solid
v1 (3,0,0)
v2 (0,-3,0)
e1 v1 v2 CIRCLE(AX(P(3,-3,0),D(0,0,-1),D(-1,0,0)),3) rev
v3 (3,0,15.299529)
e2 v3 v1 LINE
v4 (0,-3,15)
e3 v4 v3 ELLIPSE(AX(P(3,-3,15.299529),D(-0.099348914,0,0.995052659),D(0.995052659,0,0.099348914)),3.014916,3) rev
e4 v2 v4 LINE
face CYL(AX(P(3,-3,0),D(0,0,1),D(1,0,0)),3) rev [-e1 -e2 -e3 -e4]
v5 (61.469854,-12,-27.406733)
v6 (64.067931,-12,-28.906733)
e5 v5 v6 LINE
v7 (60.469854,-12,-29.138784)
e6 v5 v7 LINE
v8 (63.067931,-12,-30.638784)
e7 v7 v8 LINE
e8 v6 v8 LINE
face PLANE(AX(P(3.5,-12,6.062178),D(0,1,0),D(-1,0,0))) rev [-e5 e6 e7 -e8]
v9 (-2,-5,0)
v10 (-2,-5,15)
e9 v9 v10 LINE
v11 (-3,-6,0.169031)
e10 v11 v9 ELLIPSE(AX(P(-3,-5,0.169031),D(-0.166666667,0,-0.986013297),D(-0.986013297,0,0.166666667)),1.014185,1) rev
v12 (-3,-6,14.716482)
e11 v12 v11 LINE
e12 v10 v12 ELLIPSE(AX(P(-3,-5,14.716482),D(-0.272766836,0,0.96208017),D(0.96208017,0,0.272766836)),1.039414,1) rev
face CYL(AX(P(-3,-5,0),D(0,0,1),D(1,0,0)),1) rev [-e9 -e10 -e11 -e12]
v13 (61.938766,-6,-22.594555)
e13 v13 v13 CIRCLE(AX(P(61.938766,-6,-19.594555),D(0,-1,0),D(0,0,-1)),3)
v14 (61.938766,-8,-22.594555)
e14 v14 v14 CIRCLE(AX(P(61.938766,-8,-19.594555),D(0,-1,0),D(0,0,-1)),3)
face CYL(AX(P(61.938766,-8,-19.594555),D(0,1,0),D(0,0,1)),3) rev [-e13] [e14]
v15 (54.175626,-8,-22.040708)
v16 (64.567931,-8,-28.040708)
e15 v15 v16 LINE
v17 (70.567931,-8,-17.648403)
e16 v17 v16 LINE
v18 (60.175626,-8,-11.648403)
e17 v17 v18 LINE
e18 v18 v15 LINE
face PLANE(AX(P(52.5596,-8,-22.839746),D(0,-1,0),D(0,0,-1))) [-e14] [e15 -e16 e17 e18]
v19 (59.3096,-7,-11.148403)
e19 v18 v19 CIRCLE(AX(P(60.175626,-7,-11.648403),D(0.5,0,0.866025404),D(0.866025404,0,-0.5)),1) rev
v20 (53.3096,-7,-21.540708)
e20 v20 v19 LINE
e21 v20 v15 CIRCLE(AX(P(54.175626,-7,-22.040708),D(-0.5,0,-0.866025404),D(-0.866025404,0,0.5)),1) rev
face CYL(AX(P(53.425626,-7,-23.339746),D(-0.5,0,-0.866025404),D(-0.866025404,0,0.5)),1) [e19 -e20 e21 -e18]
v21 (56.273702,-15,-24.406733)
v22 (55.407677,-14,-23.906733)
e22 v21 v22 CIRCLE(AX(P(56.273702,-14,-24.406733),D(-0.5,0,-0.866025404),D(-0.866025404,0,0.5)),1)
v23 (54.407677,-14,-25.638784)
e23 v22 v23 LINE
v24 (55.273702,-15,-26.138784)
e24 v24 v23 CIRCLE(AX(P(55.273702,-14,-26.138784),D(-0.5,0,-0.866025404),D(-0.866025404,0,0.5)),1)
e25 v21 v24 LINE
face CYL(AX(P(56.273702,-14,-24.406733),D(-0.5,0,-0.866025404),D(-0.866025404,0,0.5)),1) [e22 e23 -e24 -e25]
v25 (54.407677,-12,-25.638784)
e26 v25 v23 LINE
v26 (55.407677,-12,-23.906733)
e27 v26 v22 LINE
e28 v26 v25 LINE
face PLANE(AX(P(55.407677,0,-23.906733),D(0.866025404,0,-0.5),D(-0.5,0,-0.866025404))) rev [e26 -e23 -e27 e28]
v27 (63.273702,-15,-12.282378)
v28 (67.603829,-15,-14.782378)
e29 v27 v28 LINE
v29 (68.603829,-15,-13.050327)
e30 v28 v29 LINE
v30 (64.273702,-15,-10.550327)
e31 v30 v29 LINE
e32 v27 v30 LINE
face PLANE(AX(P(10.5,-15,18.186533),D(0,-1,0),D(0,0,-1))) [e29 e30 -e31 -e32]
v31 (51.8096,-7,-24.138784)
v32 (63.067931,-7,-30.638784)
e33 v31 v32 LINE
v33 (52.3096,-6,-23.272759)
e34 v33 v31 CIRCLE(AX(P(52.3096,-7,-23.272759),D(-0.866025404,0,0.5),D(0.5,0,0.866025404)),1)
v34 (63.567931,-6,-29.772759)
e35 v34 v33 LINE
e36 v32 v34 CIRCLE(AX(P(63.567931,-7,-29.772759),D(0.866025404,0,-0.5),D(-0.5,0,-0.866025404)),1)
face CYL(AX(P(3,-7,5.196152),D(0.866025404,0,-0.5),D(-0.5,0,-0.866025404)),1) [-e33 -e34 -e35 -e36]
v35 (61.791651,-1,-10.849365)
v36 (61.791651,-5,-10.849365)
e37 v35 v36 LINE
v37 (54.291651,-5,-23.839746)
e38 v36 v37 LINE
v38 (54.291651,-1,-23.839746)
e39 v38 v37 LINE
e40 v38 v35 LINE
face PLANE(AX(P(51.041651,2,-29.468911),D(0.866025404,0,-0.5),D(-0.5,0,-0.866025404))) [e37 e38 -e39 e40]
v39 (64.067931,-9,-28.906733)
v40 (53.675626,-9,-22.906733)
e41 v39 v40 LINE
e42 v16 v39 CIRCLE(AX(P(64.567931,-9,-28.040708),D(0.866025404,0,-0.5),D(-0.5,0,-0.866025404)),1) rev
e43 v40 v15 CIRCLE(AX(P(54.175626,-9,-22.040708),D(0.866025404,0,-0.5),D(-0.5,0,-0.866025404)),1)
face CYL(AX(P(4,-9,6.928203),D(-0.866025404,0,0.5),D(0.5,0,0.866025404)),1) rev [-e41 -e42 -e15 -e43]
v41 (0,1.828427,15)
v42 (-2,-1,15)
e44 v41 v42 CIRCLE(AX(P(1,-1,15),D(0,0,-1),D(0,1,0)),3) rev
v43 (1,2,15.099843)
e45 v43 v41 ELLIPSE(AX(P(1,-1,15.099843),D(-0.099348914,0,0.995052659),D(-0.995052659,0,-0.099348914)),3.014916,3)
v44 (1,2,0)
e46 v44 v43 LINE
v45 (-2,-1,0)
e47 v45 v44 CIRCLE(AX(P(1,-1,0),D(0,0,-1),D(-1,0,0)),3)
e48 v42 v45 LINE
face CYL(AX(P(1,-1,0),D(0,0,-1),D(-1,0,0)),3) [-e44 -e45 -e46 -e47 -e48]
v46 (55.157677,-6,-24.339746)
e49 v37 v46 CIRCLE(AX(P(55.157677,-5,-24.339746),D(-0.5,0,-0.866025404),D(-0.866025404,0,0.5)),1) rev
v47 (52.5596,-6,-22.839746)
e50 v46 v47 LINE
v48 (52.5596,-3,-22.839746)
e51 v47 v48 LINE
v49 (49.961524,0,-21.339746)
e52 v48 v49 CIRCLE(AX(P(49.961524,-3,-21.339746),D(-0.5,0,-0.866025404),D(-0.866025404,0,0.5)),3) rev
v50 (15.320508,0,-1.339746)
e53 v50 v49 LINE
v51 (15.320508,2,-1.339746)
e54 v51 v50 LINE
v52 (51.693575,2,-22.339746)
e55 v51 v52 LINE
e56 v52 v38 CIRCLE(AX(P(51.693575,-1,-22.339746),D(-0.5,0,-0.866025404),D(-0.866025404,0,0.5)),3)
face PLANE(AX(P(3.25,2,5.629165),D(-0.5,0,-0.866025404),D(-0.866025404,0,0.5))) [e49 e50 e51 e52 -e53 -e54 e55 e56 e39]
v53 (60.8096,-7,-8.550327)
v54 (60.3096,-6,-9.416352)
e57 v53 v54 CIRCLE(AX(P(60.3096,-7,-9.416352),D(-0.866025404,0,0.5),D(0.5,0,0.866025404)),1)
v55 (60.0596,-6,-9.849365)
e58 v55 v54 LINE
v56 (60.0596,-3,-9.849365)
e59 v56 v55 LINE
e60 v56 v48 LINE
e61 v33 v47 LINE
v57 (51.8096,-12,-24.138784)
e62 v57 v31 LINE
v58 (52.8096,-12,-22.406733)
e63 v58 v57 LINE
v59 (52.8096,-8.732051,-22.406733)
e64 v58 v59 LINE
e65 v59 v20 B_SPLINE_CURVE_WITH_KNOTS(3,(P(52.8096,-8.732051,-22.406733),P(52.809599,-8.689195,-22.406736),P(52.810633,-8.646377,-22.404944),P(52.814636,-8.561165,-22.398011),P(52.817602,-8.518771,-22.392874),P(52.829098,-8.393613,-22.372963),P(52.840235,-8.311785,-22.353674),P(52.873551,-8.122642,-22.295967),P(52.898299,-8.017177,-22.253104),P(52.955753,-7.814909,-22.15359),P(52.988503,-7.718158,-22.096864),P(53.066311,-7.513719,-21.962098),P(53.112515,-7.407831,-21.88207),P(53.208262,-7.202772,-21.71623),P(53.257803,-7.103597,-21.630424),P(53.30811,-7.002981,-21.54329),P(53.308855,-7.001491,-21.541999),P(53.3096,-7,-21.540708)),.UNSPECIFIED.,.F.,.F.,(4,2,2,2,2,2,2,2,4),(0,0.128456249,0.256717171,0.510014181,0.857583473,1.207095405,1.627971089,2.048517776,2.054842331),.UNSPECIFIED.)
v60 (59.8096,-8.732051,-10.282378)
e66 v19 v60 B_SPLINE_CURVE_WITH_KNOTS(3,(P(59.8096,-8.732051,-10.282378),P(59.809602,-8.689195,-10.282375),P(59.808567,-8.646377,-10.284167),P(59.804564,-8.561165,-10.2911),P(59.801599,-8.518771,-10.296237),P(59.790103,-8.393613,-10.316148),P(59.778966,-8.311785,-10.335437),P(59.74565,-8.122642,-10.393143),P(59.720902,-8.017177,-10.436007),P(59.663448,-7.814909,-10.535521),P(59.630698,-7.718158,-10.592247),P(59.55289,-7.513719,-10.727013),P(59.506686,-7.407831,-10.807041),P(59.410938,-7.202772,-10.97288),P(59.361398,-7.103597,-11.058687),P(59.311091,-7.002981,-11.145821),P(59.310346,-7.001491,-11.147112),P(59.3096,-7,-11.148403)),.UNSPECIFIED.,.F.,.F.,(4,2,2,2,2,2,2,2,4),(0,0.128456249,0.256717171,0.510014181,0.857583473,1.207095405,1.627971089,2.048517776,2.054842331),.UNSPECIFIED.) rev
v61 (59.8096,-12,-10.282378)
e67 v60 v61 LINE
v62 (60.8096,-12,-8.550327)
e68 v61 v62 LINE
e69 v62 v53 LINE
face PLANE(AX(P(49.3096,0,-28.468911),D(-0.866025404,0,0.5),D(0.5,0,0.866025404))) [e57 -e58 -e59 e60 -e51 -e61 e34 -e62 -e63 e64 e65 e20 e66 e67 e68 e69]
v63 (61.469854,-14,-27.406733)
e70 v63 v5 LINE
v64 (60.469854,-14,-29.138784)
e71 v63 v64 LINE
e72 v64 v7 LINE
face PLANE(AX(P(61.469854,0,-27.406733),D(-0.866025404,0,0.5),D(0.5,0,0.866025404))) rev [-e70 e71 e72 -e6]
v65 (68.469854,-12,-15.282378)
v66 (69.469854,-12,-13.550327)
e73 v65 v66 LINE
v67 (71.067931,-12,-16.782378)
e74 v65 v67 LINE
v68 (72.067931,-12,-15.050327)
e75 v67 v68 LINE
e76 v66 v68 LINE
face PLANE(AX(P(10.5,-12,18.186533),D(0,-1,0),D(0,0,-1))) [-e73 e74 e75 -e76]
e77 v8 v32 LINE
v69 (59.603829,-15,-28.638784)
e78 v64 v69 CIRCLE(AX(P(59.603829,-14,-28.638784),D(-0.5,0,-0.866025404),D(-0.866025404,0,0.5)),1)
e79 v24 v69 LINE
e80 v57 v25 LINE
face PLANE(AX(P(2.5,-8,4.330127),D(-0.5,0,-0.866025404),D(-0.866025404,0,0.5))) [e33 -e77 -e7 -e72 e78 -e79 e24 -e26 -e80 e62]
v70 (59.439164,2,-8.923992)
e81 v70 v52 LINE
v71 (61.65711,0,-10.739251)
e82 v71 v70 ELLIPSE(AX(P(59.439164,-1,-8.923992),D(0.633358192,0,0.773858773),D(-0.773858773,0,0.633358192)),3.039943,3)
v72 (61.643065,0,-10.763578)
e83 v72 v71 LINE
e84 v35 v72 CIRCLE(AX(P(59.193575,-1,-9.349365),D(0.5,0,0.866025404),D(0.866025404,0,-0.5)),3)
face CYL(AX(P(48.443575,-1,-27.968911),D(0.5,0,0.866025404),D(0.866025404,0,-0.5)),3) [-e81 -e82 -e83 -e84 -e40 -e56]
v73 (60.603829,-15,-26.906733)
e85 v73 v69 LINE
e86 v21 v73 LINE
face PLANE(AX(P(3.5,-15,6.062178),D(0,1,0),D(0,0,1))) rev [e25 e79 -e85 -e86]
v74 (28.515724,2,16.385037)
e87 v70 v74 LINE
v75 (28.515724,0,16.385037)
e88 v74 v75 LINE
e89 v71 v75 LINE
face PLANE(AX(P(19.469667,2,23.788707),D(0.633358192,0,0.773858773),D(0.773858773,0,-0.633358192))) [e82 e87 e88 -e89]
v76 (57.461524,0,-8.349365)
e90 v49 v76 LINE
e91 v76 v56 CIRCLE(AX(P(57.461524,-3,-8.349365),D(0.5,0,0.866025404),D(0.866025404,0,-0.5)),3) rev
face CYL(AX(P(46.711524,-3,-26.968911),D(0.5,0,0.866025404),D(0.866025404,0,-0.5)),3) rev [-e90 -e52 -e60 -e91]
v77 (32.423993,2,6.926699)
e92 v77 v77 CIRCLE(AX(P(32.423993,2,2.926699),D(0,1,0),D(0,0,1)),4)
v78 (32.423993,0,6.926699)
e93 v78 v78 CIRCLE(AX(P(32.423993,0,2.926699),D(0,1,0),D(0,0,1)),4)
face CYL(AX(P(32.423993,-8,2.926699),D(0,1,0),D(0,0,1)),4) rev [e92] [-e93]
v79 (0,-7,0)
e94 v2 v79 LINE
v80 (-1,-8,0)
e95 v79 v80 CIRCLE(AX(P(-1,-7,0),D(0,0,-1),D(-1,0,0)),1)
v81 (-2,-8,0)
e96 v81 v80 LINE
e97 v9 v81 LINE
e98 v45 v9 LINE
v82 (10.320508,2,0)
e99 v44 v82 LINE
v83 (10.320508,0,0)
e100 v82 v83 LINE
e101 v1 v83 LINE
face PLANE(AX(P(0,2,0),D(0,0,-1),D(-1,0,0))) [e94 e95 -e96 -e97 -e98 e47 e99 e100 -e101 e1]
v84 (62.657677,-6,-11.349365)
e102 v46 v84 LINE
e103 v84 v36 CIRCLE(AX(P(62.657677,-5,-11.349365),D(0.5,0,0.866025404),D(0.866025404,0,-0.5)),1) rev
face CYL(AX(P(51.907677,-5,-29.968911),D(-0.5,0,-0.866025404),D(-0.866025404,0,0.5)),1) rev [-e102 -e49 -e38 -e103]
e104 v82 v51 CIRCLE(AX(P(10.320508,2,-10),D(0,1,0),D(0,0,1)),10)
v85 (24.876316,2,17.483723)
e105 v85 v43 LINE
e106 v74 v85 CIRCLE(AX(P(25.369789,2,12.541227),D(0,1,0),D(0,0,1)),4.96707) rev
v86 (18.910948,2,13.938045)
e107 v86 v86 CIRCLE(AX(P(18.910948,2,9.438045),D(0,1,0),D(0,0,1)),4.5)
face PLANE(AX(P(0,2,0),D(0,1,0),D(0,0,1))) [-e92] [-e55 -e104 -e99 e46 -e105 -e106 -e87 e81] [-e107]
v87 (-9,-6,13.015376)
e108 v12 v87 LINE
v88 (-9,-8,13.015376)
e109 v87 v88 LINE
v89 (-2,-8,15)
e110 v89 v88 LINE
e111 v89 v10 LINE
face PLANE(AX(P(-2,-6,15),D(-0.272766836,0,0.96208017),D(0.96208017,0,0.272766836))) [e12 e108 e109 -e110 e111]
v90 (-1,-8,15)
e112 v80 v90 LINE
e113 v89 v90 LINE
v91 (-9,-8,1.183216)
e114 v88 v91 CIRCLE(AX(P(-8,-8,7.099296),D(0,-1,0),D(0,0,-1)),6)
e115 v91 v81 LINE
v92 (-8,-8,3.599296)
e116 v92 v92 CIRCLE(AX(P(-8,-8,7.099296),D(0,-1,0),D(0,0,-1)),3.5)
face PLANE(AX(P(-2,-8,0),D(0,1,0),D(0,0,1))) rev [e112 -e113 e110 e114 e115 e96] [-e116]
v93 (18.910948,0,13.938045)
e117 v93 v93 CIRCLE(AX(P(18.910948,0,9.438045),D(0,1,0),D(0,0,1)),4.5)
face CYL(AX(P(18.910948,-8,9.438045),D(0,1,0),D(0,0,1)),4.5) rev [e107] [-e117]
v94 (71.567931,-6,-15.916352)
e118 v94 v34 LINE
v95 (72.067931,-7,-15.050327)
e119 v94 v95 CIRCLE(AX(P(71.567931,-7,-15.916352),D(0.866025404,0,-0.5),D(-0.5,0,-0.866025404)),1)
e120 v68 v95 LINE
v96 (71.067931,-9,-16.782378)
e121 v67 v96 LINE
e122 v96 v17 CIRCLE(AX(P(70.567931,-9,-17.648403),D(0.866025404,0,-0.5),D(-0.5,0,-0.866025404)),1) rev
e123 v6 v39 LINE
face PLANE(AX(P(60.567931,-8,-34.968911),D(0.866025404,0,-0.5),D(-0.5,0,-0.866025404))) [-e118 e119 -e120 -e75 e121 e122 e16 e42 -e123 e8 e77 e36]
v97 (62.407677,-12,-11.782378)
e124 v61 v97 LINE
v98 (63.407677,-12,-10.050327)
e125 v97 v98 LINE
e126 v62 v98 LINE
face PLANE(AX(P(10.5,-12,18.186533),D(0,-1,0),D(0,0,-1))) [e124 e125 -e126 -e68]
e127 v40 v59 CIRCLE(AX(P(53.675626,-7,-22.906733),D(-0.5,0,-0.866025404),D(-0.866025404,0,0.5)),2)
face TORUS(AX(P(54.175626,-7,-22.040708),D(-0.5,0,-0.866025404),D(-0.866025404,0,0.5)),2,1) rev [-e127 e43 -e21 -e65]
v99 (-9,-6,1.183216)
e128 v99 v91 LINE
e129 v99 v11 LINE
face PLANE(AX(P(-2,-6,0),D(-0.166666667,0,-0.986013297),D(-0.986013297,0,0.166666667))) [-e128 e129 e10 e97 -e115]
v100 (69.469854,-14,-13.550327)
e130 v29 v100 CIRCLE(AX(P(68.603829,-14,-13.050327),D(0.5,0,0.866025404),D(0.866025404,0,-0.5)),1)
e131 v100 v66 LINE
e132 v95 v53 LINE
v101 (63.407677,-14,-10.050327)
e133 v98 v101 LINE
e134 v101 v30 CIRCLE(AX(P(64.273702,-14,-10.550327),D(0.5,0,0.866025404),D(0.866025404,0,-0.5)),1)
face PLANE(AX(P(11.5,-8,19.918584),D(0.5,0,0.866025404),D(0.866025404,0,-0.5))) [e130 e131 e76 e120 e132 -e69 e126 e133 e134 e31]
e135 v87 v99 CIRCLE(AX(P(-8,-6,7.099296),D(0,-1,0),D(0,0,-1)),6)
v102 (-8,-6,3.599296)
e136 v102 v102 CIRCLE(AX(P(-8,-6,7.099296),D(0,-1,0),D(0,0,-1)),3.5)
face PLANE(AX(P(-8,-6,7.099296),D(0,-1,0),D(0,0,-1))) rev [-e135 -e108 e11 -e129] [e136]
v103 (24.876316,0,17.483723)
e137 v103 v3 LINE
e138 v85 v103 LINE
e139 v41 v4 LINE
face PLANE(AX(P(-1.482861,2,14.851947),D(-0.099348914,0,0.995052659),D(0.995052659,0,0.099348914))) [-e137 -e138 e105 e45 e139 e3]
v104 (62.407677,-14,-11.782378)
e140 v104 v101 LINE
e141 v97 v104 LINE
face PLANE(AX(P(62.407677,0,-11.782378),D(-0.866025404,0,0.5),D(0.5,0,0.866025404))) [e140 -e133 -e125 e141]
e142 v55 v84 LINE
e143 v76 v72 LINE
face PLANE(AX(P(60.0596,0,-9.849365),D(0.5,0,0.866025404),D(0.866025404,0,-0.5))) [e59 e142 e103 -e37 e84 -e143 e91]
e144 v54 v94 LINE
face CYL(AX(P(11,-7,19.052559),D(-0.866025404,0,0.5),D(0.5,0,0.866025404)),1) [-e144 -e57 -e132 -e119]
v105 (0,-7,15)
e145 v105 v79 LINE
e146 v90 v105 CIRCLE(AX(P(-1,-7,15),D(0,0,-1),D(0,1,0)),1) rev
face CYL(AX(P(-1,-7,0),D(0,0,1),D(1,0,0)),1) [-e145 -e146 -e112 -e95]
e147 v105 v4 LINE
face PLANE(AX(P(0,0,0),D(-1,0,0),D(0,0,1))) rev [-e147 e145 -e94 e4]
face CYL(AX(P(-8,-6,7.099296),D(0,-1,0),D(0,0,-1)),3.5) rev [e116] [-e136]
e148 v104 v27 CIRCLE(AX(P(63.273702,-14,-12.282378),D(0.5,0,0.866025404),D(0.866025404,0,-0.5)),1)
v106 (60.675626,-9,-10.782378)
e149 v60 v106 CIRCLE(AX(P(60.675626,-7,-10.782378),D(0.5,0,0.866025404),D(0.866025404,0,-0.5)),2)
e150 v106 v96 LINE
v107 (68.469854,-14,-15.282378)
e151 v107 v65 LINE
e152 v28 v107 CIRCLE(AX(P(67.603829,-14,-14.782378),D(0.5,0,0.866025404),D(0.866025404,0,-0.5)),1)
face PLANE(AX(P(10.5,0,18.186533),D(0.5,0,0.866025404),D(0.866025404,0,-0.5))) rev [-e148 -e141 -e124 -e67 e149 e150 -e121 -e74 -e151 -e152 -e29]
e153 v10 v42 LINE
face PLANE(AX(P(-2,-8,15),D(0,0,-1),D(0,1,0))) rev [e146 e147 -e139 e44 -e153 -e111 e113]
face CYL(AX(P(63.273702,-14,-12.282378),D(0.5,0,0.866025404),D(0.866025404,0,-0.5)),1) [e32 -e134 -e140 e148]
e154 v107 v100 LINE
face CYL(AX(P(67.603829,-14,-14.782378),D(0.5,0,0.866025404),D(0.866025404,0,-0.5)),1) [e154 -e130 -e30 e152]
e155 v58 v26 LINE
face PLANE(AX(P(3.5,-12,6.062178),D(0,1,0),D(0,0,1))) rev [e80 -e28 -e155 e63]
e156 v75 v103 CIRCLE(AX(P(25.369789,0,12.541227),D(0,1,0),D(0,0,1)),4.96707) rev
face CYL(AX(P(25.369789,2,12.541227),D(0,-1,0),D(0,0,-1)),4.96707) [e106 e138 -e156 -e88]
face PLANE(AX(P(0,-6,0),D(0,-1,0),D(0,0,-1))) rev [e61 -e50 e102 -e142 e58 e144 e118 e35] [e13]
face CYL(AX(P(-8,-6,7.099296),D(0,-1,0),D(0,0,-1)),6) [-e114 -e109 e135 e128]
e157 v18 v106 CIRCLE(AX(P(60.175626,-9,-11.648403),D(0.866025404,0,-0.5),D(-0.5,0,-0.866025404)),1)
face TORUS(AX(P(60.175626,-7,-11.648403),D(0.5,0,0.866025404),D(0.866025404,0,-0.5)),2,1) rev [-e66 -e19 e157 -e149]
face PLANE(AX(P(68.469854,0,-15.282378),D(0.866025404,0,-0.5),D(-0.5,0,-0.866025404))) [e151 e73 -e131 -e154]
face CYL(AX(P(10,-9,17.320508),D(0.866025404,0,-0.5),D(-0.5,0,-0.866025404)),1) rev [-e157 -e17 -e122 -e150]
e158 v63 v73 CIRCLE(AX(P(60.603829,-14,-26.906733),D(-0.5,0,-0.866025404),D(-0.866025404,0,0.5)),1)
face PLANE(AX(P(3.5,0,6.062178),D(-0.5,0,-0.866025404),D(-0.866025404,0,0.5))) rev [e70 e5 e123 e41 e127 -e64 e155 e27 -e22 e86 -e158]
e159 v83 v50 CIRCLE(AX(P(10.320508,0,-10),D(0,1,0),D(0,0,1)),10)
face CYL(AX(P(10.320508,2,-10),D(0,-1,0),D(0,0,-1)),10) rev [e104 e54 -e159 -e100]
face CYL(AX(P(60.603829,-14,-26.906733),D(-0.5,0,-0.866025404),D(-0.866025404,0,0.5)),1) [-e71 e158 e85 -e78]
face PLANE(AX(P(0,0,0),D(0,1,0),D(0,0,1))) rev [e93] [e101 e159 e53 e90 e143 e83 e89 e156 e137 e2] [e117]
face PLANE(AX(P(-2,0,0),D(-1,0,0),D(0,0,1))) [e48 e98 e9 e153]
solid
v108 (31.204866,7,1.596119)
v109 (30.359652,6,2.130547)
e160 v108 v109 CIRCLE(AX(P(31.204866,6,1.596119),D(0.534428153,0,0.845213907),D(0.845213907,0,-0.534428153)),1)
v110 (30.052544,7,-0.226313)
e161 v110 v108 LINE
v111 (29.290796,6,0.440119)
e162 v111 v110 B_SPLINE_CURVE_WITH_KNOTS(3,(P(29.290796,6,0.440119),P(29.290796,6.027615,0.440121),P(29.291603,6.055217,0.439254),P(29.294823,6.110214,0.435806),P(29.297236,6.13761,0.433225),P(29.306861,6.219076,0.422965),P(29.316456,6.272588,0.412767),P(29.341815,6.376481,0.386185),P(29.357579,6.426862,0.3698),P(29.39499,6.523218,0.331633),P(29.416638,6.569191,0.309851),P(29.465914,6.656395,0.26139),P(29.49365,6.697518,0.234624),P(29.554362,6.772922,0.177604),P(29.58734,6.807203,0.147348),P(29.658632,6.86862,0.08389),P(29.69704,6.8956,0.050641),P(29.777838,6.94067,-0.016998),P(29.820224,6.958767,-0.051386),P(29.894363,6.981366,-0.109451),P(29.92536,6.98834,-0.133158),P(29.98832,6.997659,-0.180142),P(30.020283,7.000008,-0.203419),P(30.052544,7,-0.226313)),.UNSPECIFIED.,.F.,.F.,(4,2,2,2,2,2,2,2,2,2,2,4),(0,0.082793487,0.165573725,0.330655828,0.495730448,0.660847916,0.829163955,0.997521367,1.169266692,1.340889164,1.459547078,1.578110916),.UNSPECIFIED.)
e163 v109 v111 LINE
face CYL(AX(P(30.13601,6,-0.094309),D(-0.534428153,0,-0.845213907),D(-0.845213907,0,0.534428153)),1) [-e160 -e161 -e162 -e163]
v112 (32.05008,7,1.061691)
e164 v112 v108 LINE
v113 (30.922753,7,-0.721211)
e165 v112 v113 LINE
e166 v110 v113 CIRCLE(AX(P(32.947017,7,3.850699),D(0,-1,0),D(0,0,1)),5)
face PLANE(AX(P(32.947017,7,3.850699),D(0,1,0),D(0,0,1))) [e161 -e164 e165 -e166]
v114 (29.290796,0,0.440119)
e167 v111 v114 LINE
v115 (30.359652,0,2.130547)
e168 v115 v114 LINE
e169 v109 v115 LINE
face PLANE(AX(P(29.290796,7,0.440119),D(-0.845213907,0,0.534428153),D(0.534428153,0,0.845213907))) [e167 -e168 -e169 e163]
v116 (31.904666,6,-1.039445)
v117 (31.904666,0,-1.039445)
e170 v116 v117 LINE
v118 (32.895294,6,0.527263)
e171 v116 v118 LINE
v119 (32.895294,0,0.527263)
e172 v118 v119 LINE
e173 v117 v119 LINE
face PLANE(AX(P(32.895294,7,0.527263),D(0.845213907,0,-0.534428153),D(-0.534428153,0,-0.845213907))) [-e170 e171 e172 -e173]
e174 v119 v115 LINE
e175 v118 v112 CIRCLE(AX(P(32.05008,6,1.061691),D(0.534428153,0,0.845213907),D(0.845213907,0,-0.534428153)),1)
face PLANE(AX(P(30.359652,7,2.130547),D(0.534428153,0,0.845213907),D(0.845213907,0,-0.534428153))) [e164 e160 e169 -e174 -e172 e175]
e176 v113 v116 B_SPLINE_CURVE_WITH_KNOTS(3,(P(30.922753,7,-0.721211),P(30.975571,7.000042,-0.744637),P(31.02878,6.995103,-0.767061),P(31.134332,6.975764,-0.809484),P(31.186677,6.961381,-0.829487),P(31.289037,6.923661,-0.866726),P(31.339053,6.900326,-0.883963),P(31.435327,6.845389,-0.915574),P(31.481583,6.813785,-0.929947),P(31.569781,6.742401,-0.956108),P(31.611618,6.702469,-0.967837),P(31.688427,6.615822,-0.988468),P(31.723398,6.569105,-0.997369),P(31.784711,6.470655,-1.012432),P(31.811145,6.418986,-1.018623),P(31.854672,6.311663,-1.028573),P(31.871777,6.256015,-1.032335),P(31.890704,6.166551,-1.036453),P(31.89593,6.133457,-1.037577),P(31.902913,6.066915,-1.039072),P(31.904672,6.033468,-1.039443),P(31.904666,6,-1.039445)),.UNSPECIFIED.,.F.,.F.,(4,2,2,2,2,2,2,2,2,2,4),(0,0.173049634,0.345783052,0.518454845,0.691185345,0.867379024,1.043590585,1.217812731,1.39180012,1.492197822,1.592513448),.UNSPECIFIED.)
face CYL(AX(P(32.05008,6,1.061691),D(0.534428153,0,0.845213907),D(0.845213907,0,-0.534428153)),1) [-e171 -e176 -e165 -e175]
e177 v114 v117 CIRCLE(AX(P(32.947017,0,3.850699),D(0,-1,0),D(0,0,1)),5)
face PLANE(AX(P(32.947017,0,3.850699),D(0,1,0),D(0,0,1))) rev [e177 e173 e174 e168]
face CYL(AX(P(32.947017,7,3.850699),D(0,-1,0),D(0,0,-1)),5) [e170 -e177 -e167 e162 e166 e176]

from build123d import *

# Parameters (mm, degrees)
BOSS_EXTRUDE1_DEPTH = 2
SKETCH3_W           = 15
SKETCH3_H           = 8
BOSS_EXTRUDE2_DEPTH = 2
FILLET2_R           = 3
BOSS_EXTRUDE4_DEPTH = 2
FILLET3_R           = 1
BOSS_EXTRUDE5_DEPTH = 2
BOSS_EXTRUDE6_START = -2
BOSS_EXTRUDE6_DEPTH = 2
FILLET5_R           = 1
SKETCH8_W           = 15
SKETCH8_H           = 10
BOSS_EXTRUDE7_DEPTH = 2
FILLET6_R           = 3
SKETCH9_R           = 3.5
BOSS_EXTRUDE8_DEPTH = 2
FILLET7_R           = 1
SKETCH12_R          = 4.5
SKETCH12_R_2        = 4
CUT_EXTRUDE1_DEPTH  = 10
BOSS_EXTRUDE9_DEPTH = 7
FILLET9_R           = 1


with BuildPart() as part:
    # Sketch2 → Boss-Extrude1 (new body)
    with BuildSketch(Plane(origin=(0, 0, 0), x_dir=(1, 0, 0), z_dir=(0, 1, 0))):
        with BuildLine():
            Line((0, 0), (10.320508076, 0))
            ThreePointArc((10.320508076, 0), (12.908698527, 0.340741737), (15.320508076, 1.339745962))
            Line((15.320508076, 1.339745962), (54.291651246, 23.839745962))
            Line((54.291651246, 23.839745962), (61.791651246, 10.849364905))
            Line((61.791651246, 10.849364905), (28.515723989, -16.385037331))
            ThreePointArc((28.515723989, -16.385037331), (26.805291295, -17.296341677), (24.876316463, -17.483722855))
            Line((24.876316463, -17.483722855), (0, -15))
            Line((0, -15), (0, 0))
        make_face()
    extrude(amount=BOSS_EXTRUDE1_DEPTH)

    # Sketch3 → Boss-Extrude2 (add)
    with BuildSketch(Plane(origin=(51.041651246, 0, -29.468911087), x_dir=(-0.5000000000000027, 0, -0.8660254037844372), z_dir=(0.8660254037844372, 0, -0.5000000000000027))):
        with Locations((-14, -4)):
            Rectangle(SKETCH3_W, SKETCH3_H)
    extrude(amount=-BOSS_EXTRUDE2_DEPTH)

    # Fillet2
    # the kernel refuses this fillet: 3 mm, written as the material it adds along each edge
    with BuildSketch(Plane(origin=(52.559600438, 0, -22.839745962), x_dir=(0, -1, 0), z_dir=(0.5000000000000027, 0, 0.8660254037844372))) as fillet2_piece_1:
        with BuildLine():
            CenterArc((FILLET2_R, -FILLET2_R), FILLET2_R, 90, 90)
            Line((0, -FILLET2_R), (0, 0))
            Line((0, 0), (FILLET2_R, 0))
        make_face()
    extrude(amount=15)
    # the kernel refuses this fillet: 3 mm, written as the material it takes off along each edge
    with BuildSketch(Plane(origin=(50.541651246, 2, -30.334936491), x_dir=(-0.866025403784437, 0, 0.5000000000000028), z_dir=(0.5000000000000028, 0, 0.866025403784437))) as fillet2_2_piece_1:
        with BuildLine():
            CenterArc((FILLET2_R, FILLET2_R), FILLET2_R, 180, 90)
            Line((0, FILLET2_R), (0, 0))
            Line((0, 0), (FILLET2_R, 0))
        make_face()
    extrude(amount=30, mode=Mode.SUBTRACT)

    # Sketch5 → Boss-Extrude4 (add)
    with BuildSketch(Plane(origin=(0, -6, 0), x_dir=(-1, 0, 0), z_dir=(0, -1, 0))):
        with BuildLine():
            Line((-63.067930688, 30.638784068), (-67.567930688, 22.844555434))
            Line((-67.567930688, 22.844555434), (-64.536841774, 21.094555434))
            ThreePointArc((-64.536841774, 21.094555434), (-62.715222698, 22.492332913), (-60.438765563, 22.192631645))
            Line((-60.438765563, 22.192631645), (-57.438765563, 27.388784068))
            Line((-57.438765563, 27.388784068), (-63.067930688, 30.638784068))
        make_face()
        with BuildLine():
            Line((-66.438765563, 11.8003268), (-60.809600438, 8.5503268))
            Line((-60.809600438, 8.5503268), (-60.059600438, 9.849364905))
            Line((-60.059600438, 9.849364905), (-52.559600438, 22.839745962))
            Line((-52.559600438, 22.839745962), (-51.809600438, 24.138784068))
            Line((-51.809600438, 24.138784068), (-57.438765563, 27.388784068))
            Line((-57.438765563, 27.388784068), (-60.438765563, 22.192631645))
            ThreePointArc((-60.438765563, 22.192631645), (-59.340689352, 21.094555434), (-58.938765563, 19.594555434))
            ThreePointArc((-58.938765563, 19.594555434), (-60.438765563, 16.996479222), (-63.438765563, 16.996479222))
            Line((-63.438765563, 16.996479222), (-66.438765563, 11.8003268))
        make_face()
        with BuildLine():
            Line((-72.067930688, 15.0503268), (-66.438765563, 11.8003268))
            Line((-66.438765563, 11.8003268), (-63.438765563, 16.996479222))
            ThreePointArc((-63.438765563, 16.996479222), (-64.836543042, 18.818098298), (-64.536841774, 21.094555434))
            Line((-64.536841774, 21.094555434), (-67.567930688, 22.844555434))
            Line((-67.567930688, 22.844555434), (-72.067930688, 15.0503268))
        make_face()
    extrude(amount=BOSS_EXTRUDE4_DEPTH)

    # Fillet3
    fillet3_edges = [part.edges().sort_by_distance(p)[0] for p in [
        (56.309600438, -8, -16.344555434),
        (58.041651246, -6, -17.344555434),
    ]]
    fillet(fillet3_edges, radius=FILLET3_R)

    # Sketch6 → Boss-Extrude5 (add)
    with BuildSketch(Plane(origin=(11.5, 0, 19.918584287), x_dir=(0.8660254037844387, 0, -0.4999999999999999), z_dir=(0.4999999999999999, 0, 0.8660254037844387))):
        with BuildLine():
            ThreePointArc((57.937822174, -8), (57.230715392, -7.707106781), (56.937822174, -7))
            Line((56.937822174, -7), (56.937822174, -12))
            Line((56.937822174, -12), (59.937822174, -12))
            Line((59.937822174, -12), (59.937822174, -14))
            ThreePointArc((59.937822174, -14), (60.230715392, -14.707106781), (60.937822174, -15))
            Line((60.937822174, -15), (65.937822174, -15))
            ThreePointArc((65.937822174, -15), (66.644928955, -14.707106781), (66.937822174, -14))
            Line((66.937822174, -14), (66.937822174, -12))
            Line((66.937822174, -12), (69.937822174, -12))
            Line((69.937822174, -12), (69.937822174, -8))
            Line((69.937822174, -8), (57.937822174, -8))
        make_face()
    extrude(amount=-BOSS_EXTRUDE5_DEPTH)

    # Sketch7 → Boss-Extrude6 (add)
    with BuildSketch(Plane(origin=(2.5, 0, 4.330127019), x_dir=(-0.8660254037844396, 0, 0.49999999999999856), z_dir=(-0.49999999999999856, 0, -0.8660254037844396)).offset(BOSS_EXTRUDE6_START)):
        with BuildLine():
            Line((-65.937822174, -15), (-60.937822174, -15))
            ThreePointArc((-60.937822174, -15), (-60.230715392, -14.707106781), (-59.937822174, -14))
            Line((-59.937822174, -14), (-59.937822174, -12))
            Line((-59.937822174, -12), (-56.937822174, -12))
            Line((-56.937822174, -12), (-56.937822174, -7))
            ThreePointArc((-56.937822174, -7), (-57.230715392, -7.707106781), (-57.937822174, -8))
            Line((-57.937822174, -8), (-69.937822174, -8))
            Line((-69.937822174, -8), (-69.937822174, -12))
            Line((-69.937822174, -12), (-66.937822174, -12))
            Line((-66.937822174, -12), (-66.937822174, -14))
            ThreePointArc((-66.937822174, -14), (-66.644928955, -14.707106781), (-65.937822174, -15))
        make_face()
    extrude(amount=BOSS_EXTRUDE6_DEPTH)

    # Fillet5
    # the kernel refuses this fillet: 1 mm, written as the material it adds along each edge
    with BuildSketch(Plane(origin=(60.675625842, -7, -10.782377607), x_dir=(0, -1, 0), z_dir=(0.8660254037844387, -1.4083318032254873e-14, -0.4999999999999999))) as fillet5_piece_1_section:
        with BuildLine():
            CenterArc((1 + FILLET5_R, FILLET5_R), FILLET5_R, 180, 90)
            Line((1 + FILLET5_R, 0), (1, 0))
            Line((1, 0), (1, FILLET5_R))
        make_face()
    fillet5_piece_1 = revolve(axis=Axis((60.675625842, -7, -10.782377607), (-0.4999999999999999, 0, -0.8660254037844387)), revolution_arc=233.296989237, mode=Mode.PRIVATE)
    fillet5_piece_1 = split(fillet5_piece_1, bisect_by=Plane(origin=(59.653786466, -7.749939066, -10.552255325), z_dir=(0.8660254037844372, 0, -0.5000000000000027)), keep=Keep.TOP, mode=Mode.PRIVATE)
    fillet5_piece_1 = fillet5_piece_1 - Plane(origin=(62.251862677, -5, -12.052255325), x_dir=(-0.866025403784437, 0, 0.5000000000000028), z_dir=(-0.5000000000000028, 0, -0.866025403784437)) * Cylinder(1, 9, mode=Mode.PRIVATE)
    add(fillet5_piece_1)
    with BuildSketch(Plane(origin=(71.067930688, -8, -16.782377607), x_dir=(-0.4999999999999999, -3.552713678800505e-15, -0.8660254037844387), z_dir=(-0.8660254037844387, 0, 0.4999999999999999)), Plane(origin=(53.675625842, -8, -22.90673326), x_dir=(0.49999999999999856, -1.776356839400247e-15, 0.8660254037844395), z_dir=(0.8660254037844396, 0, -0.49999999999999856))) as fillet5_piece_2:
        with BuildLine():
            CenterArc((FILLET5_R, FILLET5_R), FILLET5_R, 180, 90)
            Line((0, FILLET5_R), (0, 0))
            Line((0, 0), (FILLET5_R, 0))
        make_face()
    extrude(amount=12)
    with BuildSketch(Plane(origin=(53.675625842, -7, -22.90673326), x_dir=(0.6943308785696991, 0.5976672776326631, -0.40087211964888625), z_dir=(0.5175950454405738, -0.8017442392977709, -0.29883363881633085))) as fillet5_piece_3_section:
        with BuildLine():
            CenterArc((1 + FILLET5_R, FILLET5_R), FILLET5_R, 180, 90)
            Line((1, FILLET5_R), (1, 0))
            Line((1, 0), (1 + FILLET5_R, 0))
        make_face()
    fillet5_piece_3 = revolve(axis=Axis((53.675625842, -7, -22.90673326), (0.49999999999999856, 0, 0.8660254037844396)), revolution_arc=233.296989237, mode=Mode.PRIVATE)
    fillet5_piece_3 = split(fillet5_piece_3, bisect_by=Plane(origin=(52.965414583, -7.749938757, -22.136855245), z_dir=(0.8660254037844372, 0, -0.5000000000000027)), keep=Keep.TOP, mode=Mode.PRIVATE)
    fillet5_piece_3 = fillet5_piece_3 - Plane(origin=(55.563490794, -5, -23.636855245), x_dir=(-0.866025403784437, 0, 0.5000000000000028), z_dir=(-0.5000000000000028, 0, -0.866025403784437)) * Cylinder(1, 9, mode=Mode.PRIVATE)
    add(fillet5_piece_3)
    # the kernel refuses this fillet: 1 mm, written as the material it takes off along each edge
    with BuildSketch(Plane(origin=(58.644536929, -6, -7.3003268), x_dir=(-0.4999999999999999, 0, -0.8660254037844388), z_dir=(0.8660254037844388, 0, -0.4999999999999999))) as fillet5_2_piece_1:
        with BuildLine():
            CenterArc((FILLET5_R, -FILLET5_R), FILLET5_R, 90, 90)
            Line((0, -FILLET5_R), (0, 0))
            Line((0, 0), (FILLET5_R, 0))
        make_face()
    extrude(amount=18, mode=Mode.SUBTRACT)
    with BuildSketch(Plane(origin=(49.644536929, -6, -22.888784068), x_dir=(0.49999999999999833, 0, 0.8660254037844396), z_dir=(0.8660254037844396, 0, -0.4999999999999983))) as fillet5_2_piece_2:
        with BuildLine():
            CenterArc((FILLET5_R, FILLET5_R), FILLET5_R, 180, 90)
            Line((0, FILLET5_R), (0, 0))
            Line((0, 0), (FILLET5_R, 0))
        make_face()
    extrude(amount=18, mode=Mode.SUBTRACT)

    # Sketch8 → Boss-Extrude7 (add)
    with BuildSketch(Plane.ZY):
        with Locations((7.5, -3)):
            Rectangle(SKETCH8_W, SKETCH8_H)
    extrude(amount=BOSS_EXTRUDE7_DEPTH)

    # Fillet6
    fillet6_edges = [part.edges().sort_by_distance(p)[0] for p in [
        (0, 0, 7.5),
        (-2, 2, 7.5),
    ]]
    fillet(fillet6_edges, radius=FILLET6_R)

    # Sketch9 → Boss-Extrude8 (add)
    with BuildSketch(Plane.XZ.offset(8)):
        with BuildLine():
            Line((-2, 0), (-9, 1.183215957))
            ThreePointArc((-9, 1.183215957), (-14, 7.09929574), (-9, 13.015375523))
            Line((-9, 13.015375523), (-2, 15))
            Line((-2, 15), (-2, 0))
        make_face()
        with Locations(Location((-8, 7.09929574, 0), (0, 0, 270))):
            Circle(SKETCH9_R, mode=Mode.SUBTRACT)
    extrude(amount=-BOSS_EXTRUDE8_DEPTH)

    # Fillet7
    fillet7_edges = [part.edges().sort_by_distance(p)[0] for p in [
        (-2, -6, 7.5),
        (0, -8, 7.5),
    ]]
    fillet(fillet7_edges, radius=FILLET7_R)

    # Sketch12 → Cut-Extrude1 (cut)
    with BuildSketch(Plane(origin=(0, 2, 0), x_dir=(1, 0, 0), z_dir=(0, 1, 0))):
        with Locations(Location((18.910947854, -9.438044762, 0), (0, 0, 270))):
            Circle(SKETCH12_R)
        with Locations(Location((32.42399256, -2.926699067, 0), (0, 0, 270))):
            Circle(SKETCH12_R_2)
    extrude(amount=-CUT_EXTRUDE1_DEPTH, mode=Mode.SUBTRACT)


with BuildPart() as body_2:
    # Sketch11 → Boss-Extrude9 (new body)
    with BuildSketch(Plane.XZ):
        with BuildLine():
            Line((29.29079596, 0.440119275), (30.359652266, 2.13054709))
            Line((30.359652266, 2.13054709), (32.895293988, 0.527262631))
            Line((32.895293988, 0.527262631), (31.904665791, -1.039445119))
            ThreePointArc((31.904665791, -1.039445119), (30.484006019, -0.500574739), (29.29079596, 0.440119275))
        make_face()
    extrude(amount=-BOSS_EXTRUDE9_DEPTH)

    # Fillet9
    fillet9_edges = [body_2.edges().sort_by_distance(p)[0] for p in [
        (29.825224113, 7, 1.285333183),
        (32.399979889, 7, -0.256091244),
    ]]
    fillet(fillet9_edges, radius=FILLET9_R)


solid = Compound([part.part, body_2.part])
